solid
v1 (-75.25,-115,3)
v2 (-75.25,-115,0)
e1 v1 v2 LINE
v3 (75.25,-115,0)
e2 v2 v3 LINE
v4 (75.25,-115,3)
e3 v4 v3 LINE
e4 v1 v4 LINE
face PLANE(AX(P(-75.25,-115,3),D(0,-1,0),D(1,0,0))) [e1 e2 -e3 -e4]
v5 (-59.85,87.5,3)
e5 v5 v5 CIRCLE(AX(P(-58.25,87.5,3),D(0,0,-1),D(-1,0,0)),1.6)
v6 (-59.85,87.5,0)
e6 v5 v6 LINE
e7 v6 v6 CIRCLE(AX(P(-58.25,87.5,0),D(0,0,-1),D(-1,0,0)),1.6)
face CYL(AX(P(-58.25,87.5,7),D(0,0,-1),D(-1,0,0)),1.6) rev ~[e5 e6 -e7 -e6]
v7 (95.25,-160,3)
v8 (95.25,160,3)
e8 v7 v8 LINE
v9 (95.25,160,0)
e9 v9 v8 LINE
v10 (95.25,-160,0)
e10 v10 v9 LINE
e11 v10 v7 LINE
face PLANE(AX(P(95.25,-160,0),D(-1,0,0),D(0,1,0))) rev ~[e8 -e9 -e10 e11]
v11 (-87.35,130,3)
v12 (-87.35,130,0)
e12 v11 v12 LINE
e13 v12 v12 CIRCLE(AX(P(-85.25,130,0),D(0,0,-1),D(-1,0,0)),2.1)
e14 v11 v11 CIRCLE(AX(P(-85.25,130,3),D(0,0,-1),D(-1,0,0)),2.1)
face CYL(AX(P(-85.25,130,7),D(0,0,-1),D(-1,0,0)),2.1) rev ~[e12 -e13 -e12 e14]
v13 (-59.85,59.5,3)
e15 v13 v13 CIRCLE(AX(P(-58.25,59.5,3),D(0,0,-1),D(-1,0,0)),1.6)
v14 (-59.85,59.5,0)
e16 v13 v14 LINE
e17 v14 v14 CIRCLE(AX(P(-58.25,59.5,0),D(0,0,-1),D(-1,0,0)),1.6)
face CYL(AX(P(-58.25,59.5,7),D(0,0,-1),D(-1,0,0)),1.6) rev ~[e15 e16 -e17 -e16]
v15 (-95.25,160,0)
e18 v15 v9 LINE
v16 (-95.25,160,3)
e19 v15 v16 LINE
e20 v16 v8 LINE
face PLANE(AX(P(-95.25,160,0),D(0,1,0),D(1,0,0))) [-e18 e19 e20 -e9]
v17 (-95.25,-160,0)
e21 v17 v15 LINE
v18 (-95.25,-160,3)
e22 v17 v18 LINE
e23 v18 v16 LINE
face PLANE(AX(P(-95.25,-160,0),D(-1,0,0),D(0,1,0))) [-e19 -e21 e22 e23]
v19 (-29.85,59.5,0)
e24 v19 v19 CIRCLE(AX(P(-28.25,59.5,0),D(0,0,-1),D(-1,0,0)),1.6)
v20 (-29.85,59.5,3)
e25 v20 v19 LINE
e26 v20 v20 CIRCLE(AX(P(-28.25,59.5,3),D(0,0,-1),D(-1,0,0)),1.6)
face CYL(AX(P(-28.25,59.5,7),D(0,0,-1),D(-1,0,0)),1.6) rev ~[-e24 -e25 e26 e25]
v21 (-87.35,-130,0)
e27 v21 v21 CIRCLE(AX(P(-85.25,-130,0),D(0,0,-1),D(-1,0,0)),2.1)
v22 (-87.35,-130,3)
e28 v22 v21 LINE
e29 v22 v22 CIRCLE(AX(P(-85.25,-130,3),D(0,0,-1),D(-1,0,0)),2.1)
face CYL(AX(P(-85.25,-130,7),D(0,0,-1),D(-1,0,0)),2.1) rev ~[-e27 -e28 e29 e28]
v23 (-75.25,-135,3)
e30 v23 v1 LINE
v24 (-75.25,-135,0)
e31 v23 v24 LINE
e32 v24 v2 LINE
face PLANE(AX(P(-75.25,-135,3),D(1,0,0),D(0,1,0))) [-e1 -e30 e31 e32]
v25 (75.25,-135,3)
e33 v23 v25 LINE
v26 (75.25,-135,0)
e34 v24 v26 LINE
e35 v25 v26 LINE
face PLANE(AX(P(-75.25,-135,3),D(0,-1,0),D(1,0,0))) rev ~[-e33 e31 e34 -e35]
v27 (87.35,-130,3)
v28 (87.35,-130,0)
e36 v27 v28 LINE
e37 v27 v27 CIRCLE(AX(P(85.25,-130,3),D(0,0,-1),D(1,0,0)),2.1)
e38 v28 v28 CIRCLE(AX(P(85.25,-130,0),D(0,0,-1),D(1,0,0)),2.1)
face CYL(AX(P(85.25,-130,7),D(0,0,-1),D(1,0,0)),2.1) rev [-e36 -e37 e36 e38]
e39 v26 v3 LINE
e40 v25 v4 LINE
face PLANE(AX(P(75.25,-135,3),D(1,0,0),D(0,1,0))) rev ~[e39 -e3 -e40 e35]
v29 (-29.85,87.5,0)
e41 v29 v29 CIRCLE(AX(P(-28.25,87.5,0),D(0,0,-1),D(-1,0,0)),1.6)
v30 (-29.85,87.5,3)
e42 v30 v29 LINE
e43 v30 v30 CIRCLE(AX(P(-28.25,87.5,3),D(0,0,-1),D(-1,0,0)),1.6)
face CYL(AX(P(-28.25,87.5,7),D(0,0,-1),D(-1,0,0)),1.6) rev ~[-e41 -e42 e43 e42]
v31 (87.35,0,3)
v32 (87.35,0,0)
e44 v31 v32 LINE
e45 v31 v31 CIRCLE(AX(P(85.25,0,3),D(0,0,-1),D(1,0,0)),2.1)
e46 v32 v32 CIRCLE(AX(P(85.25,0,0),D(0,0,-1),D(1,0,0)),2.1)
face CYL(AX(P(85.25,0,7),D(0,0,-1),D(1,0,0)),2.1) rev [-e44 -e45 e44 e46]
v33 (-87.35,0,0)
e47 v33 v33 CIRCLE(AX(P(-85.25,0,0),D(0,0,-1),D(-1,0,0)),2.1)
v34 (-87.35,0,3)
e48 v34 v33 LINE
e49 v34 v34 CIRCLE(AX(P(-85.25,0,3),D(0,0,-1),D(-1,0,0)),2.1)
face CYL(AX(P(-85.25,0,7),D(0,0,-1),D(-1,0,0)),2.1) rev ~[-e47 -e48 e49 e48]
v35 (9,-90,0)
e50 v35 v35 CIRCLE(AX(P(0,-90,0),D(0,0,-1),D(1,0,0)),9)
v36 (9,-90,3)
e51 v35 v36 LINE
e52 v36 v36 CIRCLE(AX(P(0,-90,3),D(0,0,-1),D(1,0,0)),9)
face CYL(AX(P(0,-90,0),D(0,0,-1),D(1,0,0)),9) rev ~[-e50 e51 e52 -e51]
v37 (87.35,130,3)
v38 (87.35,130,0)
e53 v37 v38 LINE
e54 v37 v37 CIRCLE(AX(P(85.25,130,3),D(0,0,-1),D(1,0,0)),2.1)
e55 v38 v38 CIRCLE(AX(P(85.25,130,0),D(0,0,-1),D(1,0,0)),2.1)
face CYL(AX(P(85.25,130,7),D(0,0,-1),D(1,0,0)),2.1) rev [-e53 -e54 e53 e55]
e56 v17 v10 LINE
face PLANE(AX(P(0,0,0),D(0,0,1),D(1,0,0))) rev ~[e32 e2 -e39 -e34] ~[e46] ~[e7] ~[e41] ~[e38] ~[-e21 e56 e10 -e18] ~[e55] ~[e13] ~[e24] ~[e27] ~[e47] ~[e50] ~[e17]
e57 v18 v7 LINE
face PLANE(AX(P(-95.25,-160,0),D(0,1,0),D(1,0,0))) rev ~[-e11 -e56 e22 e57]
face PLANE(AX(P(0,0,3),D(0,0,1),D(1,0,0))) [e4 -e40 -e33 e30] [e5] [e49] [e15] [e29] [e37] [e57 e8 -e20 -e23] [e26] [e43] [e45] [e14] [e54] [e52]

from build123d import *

# Parameters (mm, degrees)
F1_W      = 190.5
F1_H      = 320
F2_DEPTH  = 3
F4_D      = 4.2
F4_DEPTH  = 4
F4_TIP    = 1.2618073
F6_D      = 3.2
F6_DEPTH  = 4
F6_TIP    = 0.9613769904
F7_W      = 150.5
F7_H      = 20
F8_DEPTH  = 25
F9_R      = 9
F10_DEPTH = 3


# Not quite as in the source:
# - a pattern or mirror of a feature is missing from the dataset's text; its kind, count and spacing are read off the source's solid


with BuildPart() as f2:
    # F1 (on Top) → F2 (new body)
    with BuildSketch(Plane.XY):
        Rectangle(F1_W, F1_H)
    extrude(amount=F2_DEPTH)

    # F4
    with Locations(Plane.XY.offset(3)):
        with Locations((-85.25, 130), (-85.25, 0), (-85.25, -130)):
            f4 = Hole(F4_D / 2, depth=F4_DEPTH)
            with Locations((0, 0, -(F4_DEPTH + F4_TIP / 2))):  # 118° drill point
                Cone(0, F4_D / 2, F4_TIP, mode=Mode.SUBTRACT)

    # F4_copies: F4 across plane
    add(f4.mirror(Plane(origin=(0, 0, 0), x_dir=(0, 0, 1), z_dir=(1, 0, 0))), mode=Mode.SUBTRACT)

    # F6
    with Locations(Plane.XY.offset(3)):
        with Locations((-58.25, 87.5), (-58.25, 59.5), (-28.25, 59.5), (-28.25, 87.5)):
            Hole(F6_D / 2, depth=F6_DEPTH)
            with Locations((0, 0, -(F6_DEPTH + F6_TIP / 2))):  # 118° drill point
                Cone(0, F6_D / 2, F6_TIP, mode=Mode.SUBTRACT)

    # F7 (on face) → F8 (cut)
    with BuildSketch(Plane.XY.offset(3)):
        with Locations((0, -125)):
            Rectangle(F7_W, F7_H)
    extrude(amount=-F8_DEPTH, mode=Mode.SUBTRACT)

    # F9 (on face) → F10 (cut, through all)
    with BuildSketch(Plane(origin=(0, 0, 0), x_dir=(1, 0, 0), z_dir=(0, 0, -1))):
        with Locations((0, 90)):
            Circle(F9_R)
    extrude(amount=-F10_DEPTH, mode=Mode.SUBTRACT)


solid = f2.part
